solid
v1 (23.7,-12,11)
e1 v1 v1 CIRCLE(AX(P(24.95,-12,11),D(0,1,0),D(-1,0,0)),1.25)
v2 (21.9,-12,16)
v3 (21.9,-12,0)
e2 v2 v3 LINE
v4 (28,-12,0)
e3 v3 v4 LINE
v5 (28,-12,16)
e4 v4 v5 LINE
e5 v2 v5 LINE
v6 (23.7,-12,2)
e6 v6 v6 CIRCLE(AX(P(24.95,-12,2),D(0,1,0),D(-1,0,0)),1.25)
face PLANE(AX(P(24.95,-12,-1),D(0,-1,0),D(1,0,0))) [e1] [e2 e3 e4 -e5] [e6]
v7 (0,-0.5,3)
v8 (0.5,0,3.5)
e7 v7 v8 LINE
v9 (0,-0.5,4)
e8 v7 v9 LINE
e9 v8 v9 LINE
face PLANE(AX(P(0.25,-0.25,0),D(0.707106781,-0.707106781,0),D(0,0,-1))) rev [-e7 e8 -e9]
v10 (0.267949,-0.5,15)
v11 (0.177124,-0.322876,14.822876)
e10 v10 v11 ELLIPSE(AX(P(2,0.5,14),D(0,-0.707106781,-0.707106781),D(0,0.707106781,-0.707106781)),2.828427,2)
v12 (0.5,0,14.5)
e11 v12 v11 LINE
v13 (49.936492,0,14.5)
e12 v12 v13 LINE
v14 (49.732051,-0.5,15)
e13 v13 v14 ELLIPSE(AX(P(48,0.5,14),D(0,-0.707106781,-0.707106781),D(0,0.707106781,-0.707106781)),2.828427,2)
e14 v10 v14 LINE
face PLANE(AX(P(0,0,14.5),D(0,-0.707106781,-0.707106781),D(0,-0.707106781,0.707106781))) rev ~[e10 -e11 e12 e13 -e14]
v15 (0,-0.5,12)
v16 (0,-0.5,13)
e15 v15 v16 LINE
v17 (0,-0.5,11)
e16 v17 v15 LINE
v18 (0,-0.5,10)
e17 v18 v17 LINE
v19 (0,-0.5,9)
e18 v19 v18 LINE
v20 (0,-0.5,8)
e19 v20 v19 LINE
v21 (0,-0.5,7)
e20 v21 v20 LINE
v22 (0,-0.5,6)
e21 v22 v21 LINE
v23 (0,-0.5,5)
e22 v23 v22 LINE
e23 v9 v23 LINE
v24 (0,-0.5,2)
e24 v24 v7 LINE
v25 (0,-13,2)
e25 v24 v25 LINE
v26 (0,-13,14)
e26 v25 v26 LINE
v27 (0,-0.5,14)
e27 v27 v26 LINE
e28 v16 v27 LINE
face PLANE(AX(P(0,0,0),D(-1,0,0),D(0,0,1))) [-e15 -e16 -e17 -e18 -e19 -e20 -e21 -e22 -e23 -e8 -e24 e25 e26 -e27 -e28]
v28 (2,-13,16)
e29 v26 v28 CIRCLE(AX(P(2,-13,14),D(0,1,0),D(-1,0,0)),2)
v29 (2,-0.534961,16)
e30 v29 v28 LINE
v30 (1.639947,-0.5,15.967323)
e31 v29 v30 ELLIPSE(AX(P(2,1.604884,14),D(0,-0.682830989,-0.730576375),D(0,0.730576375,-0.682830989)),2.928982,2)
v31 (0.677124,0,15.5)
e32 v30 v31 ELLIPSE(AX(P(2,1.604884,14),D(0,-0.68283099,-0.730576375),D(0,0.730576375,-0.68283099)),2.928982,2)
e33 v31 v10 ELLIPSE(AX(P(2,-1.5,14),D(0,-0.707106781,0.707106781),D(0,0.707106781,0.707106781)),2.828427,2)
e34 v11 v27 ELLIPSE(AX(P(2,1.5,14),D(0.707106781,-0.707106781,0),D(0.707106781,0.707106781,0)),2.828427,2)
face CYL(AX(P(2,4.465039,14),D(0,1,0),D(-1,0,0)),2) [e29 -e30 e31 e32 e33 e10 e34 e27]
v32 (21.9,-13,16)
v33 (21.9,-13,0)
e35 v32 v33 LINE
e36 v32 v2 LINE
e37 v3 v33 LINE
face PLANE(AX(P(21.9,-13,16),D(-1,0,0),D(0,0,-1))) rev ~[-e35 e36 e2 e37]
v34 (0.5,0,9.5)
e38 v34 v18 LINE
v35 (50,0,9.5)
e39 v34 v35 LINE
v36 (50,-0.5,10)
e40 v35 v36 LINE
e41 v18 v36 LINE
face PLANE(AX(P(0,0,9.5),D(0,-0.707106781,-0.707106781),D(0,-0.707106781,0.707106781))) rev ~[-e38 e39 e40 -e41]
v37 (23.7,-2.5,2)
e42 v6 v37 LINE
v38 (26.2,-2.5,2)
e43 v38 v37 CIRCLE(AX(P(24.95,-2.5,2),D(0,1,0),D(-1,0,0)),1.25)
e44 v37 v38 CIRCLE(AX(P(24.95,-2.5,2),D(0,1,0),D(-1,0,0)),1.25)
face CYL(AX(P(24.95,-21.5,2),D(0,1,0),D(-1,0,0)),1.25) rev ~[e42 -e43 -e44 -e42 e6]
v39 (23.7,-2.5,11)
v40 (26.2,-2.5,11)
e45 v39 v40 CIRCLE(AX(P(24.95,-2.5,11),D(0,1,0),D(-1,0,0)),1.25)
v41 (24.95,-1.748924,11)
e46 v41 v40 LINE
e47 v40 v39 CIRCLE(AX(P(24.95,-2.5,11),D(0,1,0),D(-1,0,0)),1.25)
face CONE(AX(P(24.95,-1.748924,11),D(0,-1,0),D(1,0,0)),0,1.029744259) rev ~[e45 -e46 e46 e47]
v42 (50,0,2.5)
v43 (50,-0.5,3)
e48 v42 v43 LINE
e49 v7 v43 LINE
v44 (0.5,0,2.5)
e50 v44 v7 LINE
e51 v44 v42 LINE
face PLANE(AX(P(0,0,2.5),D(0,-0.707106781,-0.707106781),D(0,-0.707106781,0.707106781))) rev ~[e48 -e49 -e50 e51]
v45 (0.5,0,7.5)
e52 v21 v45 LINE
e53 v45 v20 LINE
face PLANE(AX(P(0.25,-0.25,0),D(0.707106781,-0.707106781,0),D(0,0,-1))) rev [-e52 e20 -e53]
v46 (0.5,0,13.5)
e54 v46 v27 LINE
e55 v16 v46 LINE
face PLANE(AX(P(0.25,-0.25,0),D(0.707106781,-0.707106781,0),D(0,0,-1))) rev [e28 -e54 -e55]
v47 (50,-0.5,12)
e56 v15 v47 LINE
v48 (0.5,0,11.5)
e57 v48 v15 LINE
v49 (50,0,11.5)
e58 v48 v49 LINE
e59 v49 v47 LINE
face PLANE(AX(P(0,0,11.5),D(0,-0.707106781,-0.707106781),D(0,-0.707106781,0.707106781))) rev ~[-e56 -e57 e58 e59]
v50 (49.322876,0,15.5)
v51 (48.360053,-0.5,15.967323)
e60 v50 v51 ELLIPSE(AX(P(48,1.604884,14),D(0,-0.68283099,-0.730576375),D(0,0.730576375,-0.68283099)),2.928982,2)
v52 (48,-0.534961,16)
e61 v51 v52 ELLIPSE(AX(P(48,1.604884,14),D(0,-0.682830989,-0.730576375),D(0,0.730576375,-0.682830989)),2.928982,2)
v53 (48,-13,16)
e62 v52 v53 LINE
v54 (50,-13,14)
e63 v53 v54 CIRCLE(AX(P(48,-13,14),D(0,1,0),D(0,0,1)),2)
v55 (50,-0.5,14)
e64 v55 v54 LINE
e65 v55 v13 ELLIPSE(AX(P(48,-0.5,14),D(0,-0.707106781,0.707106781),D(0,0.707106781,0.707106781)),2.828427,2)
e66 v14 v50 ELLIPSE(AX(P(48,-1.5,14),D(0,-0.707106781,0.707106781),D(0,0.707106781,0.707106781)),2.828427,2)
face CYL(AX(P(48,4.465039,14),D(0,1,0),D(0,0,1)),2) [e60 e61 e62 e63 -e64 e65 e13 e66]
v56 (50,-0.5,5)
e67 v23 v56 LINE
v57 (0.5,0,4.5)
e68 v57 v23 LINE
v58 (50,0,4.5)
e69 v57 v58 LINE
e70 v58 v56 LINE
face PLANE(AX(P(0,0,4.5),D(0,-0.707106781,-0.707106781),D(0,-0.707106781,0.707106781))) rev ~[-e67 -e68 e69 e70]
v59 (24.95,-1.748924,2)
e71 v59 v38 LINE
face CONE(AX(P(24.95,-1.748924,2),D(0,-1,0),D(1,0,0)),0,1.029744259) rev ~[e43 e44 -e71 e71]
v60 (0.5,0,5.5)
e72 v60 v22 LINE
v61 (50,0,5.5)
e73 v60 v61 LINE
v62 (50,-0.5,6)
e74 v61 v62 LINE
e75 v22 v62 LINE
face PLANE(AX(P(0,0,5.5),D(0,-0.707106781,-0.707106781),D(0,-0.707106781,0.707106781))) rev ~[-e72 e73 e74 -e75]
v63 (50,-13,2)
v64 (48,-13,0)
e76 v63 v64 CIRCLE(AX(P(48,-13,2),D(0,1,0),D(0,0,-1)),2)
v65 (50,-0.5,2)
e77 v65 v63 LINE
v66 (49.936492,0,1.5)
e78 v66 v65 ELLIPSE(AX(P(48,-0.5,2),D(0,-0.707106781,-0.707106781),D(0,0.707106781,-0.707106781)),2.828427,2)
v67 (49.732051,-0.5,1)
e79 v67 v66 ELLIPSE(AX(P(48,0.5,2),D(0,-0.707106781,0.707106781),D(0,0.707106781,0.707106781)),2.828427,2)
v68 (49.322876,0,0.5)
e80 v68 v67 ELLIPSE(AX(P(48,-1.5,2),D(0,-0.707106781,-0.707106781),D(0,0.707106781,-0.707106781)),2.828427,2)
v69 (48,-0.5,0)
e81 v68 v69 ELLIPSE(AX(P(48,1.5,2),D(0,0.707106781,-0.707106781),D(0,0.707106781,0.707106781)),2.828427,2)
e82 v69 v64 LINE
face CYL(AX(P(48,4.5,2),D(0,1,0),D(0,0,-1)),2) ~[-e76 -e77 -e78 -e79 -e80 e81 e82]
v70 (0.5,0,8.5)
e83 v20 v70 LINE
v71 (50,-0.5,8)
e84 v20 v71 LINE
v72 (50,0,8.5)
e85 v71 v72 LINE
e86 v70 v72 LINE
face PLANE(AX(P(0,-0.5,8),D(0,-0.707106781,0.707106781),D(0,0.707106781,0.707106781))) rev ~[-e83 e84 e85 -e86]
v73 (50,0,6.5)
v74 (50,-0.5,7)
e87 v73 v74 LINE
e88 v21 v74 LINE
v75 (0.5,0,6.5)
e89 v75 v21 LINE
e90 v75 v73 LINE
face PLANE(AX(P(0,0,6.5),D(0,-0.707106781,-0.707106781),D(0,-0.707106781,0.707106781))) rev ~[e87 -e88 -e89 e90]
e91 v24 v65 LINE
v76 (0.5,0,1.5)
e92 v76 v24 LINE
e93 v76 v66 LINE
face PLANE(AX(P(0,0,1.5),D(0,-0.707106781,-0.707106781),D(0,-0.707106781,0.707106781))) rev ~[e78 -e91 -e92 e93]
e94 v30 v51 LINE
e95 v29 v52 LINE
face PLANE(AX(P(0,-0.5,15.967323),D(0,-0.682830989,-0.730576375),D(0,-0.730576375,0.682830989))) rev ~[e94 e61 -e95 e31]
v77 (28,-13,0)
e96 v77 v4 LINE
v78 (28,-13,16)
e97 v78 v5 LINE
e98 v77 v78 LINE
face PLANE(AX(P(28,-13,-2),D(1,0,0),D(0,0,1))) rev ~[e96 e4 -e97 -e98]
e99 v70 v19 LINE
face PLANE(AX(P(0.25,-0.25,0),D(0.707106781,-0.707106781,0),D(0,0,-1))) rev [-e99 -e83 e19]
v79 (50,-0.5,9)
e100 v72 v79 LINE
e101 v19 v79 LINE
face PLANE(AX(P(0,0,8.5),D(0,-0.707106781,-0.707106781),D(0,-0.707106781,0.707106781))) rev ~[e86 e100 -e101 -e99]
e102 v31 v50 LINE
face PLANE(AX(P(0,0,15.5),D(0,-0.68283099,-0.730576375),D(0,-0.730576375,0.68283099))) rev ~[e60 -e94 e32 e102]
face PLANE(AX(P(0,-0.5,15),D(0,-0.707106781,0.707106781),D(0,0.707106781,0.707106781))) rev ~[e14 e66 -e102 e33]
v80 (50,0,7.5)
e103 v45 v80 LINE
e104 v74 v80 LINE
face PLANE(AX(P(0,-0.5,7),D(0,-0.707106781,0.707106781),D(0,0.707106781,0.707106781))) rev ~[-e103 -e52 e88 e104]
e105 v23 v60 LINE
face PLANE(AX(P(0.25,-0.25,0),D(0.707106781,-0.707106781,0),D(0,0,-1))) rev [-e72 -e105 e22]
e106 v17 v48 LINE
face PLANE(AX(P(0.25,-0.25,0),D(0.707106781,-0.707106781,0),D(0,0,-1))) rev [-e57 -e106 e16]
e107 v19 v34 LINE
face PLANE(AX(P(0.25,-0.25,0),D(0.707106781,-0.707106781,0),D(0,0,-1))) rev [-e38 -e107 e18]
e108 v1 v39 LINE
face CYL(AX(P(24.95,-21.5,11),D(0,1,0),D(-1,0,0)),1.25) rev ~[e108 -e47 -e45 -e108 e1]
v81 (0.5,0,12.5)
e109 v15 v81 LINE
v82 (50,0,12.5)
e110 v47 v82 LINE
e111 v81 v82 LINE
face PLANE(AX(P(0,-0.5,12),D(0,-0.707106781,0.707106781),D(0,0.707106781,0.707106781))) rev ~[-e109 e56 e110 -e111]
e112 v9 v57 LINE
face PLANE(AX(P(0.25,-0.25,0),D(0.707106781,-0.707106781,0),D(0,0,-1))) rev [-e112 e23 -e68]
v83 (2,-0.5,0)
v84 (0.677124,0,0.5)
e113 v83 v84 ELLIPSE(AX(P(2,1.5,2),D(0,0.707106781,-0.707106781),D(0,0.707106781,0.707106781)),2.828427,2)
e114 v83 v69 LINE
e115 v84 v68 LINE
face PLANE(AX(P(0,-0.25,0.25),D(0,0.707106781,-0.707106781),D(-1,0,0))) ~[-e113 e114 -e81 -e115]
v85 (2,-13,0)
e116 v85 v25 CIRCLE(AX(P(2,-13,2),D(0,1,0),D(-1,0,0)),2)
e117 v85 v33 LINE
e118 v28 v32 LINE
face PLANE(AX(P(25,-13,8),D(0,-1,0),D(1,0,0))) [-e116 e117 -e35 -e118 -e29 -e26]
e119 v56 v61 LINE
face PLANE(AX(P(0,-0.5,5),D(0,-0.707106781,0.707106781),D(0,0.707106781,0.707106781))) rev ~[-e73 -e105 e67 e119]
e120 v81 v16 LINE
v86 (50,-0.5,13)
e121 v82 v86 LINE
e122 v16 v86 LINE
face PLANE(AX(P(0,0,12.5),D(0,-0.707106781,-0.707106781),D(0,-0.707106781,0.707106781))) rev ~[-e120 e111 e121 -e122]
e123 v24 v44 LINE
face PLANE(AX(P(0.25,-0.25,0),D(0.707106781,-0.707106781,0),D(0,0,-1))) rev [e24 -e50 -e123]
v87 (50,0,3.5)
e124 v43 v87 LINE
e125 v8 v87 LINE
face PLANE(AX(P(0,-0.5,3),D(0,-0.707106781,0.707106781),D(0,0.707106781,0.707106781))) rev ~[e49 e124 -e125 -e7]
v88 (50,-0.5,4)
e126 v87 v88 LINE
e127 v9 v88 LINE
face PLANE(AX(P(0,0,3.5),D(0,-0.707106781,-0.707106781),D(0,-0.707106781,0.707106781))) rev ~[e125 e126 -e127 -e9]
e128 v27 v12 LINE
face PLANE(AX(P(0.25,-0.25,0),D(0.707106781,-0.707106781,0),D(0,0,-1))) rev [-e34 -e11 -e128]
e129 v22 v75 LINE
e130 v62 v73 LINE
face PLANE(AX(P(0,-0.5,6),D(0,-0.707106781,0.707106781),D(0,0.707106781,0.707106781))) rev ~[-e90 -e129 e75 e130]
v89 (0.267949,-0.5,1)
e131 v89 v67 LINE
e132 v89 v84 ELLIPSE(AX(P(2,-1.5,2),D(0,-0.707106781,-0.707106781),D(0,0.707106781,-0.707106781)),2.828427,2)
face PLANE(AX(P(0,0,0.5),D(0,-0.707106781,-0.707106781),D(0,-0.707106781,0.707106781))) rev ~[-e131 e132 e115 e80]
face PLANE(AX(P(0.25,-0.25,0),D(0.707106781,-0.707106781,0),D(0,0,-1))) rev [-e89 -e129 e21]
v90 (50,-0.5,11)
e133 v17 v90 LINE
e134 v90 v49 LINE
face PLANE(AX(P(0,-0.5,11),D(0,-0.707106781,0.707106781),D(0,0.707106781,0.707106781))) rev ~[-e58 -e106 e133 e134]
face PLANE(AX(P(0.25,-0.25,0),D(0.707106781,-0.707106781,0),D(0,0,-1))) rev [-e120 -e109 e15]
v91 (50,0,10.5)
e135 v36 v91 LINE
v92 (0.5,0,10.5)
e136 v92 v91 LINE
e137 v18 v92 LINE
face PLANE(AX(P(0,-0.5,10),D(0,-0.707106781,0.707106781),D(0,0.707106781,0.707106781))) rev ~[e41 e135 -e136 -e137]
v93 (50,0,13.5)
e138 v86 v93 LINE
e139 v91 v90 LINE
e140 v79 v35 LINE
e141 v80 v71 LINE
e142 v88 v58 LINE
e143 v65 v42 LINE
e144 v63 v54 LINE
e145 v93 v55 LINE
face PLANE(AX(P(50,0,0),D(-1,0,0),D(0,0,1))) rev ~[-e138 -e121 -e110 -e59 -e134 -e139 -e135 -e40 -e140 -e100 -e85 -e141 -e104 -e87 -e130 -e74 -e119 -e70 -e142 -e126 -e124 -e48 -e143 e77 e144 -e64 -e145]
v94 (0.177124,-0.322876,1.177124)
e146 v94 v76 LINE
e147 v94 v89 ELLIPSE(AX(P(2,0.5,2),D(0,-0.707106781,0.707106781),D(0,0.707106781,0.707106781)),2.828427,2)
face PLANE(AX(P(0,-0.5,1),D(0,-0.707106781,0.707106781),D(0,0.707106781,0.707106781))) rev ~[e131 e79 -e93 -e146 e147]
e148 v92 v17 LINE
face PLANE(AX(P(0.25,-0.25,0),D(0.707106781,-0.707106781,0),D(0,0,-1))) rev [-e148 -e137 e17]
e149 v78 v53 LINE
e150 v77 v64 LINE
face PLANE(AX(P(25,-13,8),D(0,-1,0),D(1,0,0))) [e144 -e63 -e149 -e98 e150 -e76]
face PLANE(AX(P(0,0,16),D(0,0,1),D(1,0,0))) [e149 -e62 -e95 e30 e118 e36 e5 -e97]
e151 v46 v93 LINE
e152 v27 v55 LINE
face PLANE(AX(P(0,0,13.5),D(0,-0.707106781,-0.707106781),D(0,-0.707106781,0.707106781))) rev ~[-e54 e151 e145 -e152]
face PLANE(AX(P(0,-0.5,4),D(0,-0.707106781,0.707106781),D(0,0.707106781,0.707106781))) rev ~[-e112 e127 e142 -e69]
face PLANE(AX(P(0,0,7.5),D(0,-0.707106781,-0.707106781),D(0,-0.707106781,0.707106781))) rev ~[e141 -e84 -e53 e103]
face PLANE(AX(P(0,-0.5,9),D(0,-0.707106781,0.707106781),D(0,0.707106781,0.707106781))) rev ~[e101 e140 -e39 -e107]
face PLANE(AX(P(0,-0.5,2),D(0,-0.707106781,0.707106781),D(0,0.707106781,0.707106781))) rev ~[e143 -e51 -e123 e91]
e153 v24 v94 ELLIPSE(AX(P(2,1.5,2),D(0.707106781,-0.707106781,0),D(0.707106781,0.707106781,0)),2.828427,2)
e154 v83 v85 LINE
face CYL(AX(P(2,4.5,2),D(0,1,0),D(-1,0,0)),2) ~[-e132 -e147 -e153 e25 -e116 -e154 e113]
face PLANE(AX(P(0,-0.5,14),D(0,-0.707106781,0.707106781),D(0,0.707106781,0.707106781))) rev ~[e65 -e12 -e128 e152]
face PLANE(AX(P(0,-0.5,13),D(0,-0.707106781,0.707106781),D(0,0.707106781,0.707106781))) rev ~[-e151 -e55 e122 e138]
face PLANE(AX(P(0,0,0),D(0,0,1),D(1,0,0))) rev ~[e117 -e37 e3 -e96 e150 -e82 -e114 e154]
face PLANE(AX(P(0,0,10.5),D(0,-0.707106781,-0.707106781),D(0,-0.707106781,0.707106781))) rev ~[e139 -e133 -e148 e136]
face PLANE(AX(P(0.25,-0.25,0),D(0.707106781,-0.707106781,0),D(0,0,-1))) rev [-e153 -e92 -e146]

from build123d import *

# Parameters (mm, degrees)
F0_W         = 50
F0_H         = 16
F1_DEPTH     = 13
F2_W         = 6.1
F2_H         = 2
F2_H_2       = 16
F3_DEPTH     = 1
F5_D         = 2.5
F5_DEPTH     = 9.5
F5_TIP       = 0.7510757738
F6_SIZE      = 0.5
F8_DEPTH     = 50.001
F9_DEPTH     = 50.001
F10_T1_DEPTH = 22.4650386507
F10_T3_DEPTH = 22.5


# Not quite as in the source:
# - a fillet or chamfer that OpenCascade refuses, or shapes differently, is made with other operations: its cross-section is extruded or revolved along the edge and cut away or added


with BuildPart() as f1:
    # F0 (on Front) → F1 (new body)
    with BuildSketch(Plane.XZ):
        with Locations((25, 8)):
            Rectangle(F0_W, F0_H)
    extrude(amount=F1_DEPTH)

    # F2 (on face) → F3 (cut)
    with BuildSketch(Plane.XZ.offset(13)):
        with Locations((24.95, -1)):
            Rectangle(F2_W, F2_H)
        with Locations((24.95, 8)):
            Rectangle(F2_W, F2_H_2)
    extrude(amount=-F3_DEPTH, mode=Mode.SUBTRACT)

    # F5
    with Locations(Plane.XZ.offset(12)):
        with Locations((24.95, 11), (24.95, 2)):
            Hole(F5_D / 2, depth=F5_DEPTH)
            with Locations((0, 0, -(F5_DEPTH + F5_TIP / 2))):  # 118° drill point
                Cone(0, F5_D / 2, F5_TIP, mode=Mode.SUBTRACT)

    # F6
    f6_edges = [f1.edges().sort_by_distance(p)[0] for p in [
        (0, 0, 8),
        (25, 0, 16),
        (25, 0, 0),
    ]]
    chamfer(f6_edges, length=F6_SIZE)

    # F7 (on face) → F8 (cut, through all)
    with BuildSketch(Plane(origin=(0, 0, 0), x_dir=(0, -1, 0), z_dir=(-1, 0, 0))):
        Polygon((0, 3.5), (0, 2.5), (0.5, 3), align=None)
        Polygon((0, 4.5), (0, 3.5), (0.5, 4), align=None)
        Polygon((0, 5.5), (0, 4.5), (0.5, 5), align=None)
        Polygon((0, 6.5), (0, 5.5), (0.5, 6), align=None)
        Polygon((0, 7.5), (0, 6.5), (0.5, 7), align=None)
        Polygon((0, 8.5), (0, 7.5), (0.5, 8), align=None)
        Polygon((0, 9.5), (0, 8.5), (0.5, 9), align=None)
        Polygon((0, 10.5), (0, 9.5), (0.5, 10), align=None)
        Polygon((0, 11.5), (0, 10.5), (0.5, 11), align=None)
        Polygon((0.5, 12), (0, 12.5), (0, 11.5), align=None)
        Polygon((0.5, 13), (0, 13.5), (0, 12.5), align=None)
        Polygon((0.5, 14), (0, 14.5), (0, 13.5), align=None)
        Polygon((0.5, 15), (0, 15.5), (0, 14.5), align=None)
        Polygon((0.5, 16), (0.5349613493, 16), (0, 16.5), (0, 15.5), (0.5, 15.9673234811), align=None)
        Polygon((0.5, 15.9673234811), (0.5349613493, 16), (0.5, 16), align=None)
        Polygon((0, 1.5), (0, 0.5), (0.5, 1), align=None)
    extrude(amount=-F8_DEPTH, mode=Mode.SUBTRACT)

    # F7 (on face) → F9 (cut, through all)
    with BuildSketch(Plane(origin=(0, 0, 0), x_dir=(0, -1, 0), z_dir=(-1, 0, 0))):
        Polygon((0, 2.5), (0, 1.5), (0.5, 2), align=None)
    extrude(amount=-F9_DEPTH, mode=Mode.SUBTRACT)

    # F10: fillet of radius 2 on 4 edges, made by hand

    # F10_s2 → F10_t1 (cut)
    with BuildSketch(Plane.XZ.offset(-4.4650386507)):
        with BuildLine():
            ThreePointArc((48, 16), (49.4142135624, 15.4142135624), (50, 14))
            Line((50, 14), (50, 16))
            Line((50, 16), (48, 16))
        make_face()
        with BuildLine():
            ThreePointArc((0, 14), (0.5857864376, 15.4142135624), (2, 16))
            Line((2, 16), (0, 16))
            Line((0, 16), (0, 14))
        make_face()
    extrude(amount=F10_T1_DEPTH, mode=Mode.SUBTRACT)

    # F10_s4 → F10_t3 (cut)
    with BuildSketch(Plane.XZ.offset(-4.5)):
        with BuildLine():
            ThreePointArc((48, 0), (49.4142135624, 0.5857864376), (50, 2))
            Line((50, 2), (50, 0))
            Line((50, 0), (48, 0))
        make_face()
        with BuildLine():
            ThreePointArc((0, 2), (0.5857864376, 0.5857864376), (2, 0))
            Line((2, 0), (0, 0))
            Line((0, 0), (0, 2))
        make_face()
    extrude(amount=F10_T3_DEPTH, mode=Mode.SUBTRACT)


solid = f1.part
